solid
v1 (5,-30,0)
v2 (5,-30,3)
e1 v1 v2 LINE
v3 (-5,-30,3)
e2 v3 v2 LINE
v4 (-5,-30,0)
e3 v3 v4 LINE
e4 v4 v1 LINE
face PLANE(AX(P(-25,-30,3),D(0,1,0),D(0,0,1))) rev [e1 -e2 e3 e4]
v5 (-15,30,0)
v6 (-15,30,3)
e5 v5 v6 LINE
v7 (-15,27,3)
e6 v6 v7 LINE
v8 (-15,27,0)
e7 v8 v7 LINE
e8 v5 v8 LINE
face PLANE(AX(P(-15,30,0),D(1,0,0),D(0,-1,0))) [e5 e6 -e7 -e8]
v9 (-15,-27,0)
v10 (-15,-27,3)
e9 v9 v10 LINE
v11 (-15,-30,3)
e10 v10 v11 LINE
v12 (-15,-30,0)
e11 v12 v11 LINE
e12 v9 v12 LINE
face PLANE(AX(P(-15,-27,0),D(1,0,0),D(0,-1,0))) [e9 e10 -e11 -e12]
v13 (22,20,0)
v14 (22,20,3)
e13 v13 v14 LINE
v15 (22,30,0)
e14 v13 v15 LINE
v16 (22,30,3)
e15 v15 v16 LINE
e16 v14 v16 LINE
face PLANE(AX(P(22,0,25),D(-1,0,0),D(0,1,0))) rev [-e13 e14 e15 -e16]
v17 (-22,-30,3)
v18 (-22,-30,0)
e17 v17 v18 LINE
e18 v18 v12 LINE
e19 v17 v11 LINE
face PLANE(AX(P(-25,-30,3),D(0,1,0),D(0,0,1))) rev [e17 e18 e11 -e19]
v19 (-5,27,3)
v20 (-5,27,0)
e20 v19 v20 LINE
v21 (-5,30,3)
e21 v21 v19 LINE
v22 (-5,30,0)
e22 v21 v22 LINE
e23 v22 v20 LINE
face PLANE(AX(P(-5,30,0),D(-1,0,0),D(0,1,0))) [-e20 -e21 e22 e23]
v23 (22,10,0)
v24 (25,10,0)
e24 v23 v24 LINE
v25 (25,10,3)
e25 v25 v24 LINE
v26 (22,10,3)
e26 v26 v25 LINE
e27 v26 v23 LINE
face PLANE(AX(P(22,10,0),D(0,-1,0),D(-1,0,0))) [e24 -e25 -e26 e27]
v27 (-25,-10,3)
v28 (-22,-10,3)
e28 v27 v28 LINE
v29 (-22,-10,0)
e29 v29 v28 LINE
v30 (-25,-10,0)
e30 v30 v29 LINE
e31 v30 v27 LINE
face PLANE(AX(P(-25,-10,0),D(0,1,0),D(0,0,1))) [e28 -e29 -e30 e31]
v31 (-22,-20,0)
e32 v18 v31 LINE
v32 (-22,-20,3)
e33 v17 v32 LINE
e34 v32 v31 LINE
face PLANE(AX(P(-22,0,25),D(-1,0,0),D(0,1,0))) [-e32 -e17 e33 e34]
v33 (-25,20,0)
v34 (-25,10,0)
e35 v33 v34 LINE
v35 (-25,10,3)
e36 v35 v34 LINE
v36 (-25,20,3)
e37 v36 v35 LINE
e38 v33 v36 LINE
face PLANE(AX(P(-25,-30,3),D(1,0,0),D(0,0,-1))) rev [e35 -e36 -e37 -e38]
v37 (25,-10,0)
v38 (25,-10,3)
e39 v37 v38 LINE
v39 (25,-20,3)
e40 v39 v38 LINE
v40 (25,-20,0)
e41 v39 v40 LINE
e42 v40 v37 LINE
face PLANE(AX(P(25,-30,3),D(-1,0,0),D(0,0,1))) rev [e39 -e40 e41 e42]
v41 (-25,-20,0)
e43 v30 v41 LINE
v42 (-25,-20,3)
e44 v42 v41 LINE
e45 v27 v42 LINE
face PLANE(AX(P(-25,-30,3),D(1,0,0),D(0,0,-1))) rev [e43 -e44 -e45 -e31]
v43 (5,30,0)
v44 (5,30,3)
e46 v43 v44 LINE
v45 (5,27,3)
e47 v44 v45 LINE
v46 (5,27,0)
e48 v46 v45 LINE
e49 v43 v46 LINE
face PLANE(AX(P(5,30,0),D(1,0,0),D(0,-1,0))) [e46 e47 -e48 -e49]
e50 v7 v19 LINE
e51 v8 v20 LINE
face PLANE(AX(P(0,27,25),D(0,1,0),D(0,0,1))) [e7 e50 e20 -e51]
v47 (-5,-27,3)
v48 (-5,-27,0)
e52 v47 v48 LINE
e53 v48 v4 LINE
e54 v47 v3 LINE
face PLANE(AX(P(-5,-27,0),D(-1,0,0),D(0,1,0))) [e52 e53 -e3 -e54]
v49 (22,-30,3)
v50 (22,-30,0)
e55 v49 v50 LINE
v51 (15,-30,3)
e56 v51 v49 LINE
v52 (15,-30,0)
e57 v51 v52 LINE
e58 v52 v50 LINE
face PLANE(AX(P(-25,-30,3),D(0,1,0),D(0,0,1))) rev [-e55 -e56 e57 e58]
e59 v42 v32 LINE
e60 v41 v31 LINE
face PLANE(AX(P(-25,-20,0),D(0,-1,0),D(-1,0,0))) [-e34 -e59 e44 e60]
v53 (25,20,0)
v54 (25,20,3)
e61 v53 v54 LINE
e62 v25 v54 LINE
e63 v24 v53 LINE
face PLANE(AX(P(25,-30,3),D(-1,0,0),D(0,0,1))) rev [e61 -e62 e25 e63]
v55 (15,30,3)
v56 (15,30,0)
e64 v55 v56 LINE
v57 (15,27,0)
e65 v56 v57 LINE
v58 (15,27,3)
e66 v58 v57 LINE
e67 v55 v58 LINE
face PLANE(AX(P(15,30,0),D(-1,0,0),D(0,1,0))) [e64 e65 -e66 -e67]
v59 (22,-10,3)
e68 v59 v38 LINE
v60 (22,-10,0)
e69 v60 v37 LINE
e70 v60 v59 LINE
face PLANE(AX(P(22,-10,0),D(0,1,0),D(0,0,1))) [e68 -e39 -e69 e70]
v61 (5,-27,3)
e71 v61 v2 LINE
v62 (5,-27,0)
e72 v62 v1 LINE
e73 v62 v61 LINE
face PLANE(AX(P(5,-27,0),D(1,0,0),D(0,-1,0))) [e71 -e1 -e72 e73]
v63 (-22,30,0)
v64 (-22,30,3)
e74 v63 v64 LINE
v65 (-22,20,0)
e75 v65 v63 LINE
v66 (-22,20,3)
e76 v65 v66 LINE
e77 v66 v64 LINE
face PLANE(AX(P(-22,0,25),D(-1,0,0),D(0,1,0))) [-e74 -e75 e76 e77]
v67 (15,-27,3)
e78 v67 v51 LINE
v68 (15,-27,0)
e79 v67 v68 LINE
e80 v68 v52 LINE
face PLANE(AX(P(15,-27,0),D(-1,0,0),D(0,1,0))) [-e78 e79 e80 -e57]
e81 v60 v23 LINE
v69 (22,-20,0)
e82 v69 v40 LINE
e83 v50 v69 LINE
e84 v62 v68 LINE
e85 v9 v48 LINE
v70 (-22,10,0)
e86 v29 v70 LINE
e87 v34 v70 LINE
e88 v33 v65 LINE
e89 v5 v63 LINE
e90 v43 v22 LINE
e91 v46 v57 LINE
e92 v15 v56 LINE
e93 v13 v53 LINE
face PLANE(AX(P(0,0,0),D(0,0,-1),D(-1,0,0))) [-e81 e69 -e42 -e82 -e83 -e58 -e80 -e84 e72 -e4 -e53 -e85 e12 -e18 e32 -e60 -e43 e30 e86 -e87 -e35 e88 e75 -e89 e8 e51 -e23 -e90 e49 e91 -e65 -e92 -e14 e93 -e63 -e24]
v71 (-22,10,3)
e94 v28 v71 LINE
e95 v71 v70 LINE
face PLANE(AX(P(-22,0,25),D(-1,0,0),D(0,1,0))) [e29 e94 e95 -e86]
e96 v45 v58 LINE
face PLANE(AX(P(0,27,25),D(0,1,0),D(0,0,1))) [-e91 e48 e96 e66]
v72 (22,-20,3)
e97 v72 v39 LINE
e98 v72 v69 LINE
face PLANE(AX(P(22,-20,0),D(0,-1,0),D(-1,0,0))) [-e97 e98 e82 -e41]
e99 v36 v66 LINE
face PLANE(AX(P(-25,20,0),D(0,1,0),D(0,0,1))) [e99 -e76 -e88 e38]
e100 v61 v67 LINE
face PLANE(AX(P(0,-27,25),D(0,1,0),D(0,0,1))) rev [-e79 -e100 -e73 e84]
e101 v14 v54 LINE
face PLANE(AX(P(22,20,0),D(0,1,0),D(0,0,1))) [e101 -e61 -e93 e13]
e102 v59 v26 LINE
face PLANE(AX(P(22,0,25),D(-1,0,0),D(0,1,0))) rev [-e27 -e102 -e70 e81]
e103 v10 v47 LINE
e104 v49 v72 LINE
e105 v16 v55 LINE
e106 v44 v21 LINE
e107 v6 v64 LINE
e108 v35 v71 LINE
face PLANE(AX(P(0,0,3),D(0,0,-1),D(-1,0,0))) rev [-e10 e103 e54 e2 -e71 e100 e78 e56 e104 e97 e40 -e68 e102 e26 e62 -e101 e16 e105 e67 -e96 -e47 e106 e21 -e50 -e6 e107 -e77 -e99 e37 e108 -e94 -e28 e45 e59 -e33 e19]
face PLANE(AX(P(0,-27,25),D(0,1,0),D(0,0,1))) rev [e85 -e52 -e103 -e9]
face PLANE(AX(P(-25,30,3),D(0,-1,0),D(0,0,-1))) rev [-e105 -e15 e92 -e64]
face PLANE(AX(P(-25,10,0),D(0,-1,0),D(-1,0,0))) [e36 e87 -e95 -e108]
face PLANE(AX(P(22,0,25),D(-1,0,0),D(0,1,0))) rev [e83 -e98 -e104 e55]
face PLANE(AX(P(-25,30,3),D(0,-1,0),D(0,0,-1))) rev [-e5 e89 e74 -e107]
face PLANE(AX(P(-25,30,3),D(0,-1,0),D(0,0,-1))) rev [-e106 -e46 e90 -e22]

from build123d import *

# Parameters (mm, degrees)
SKETCH1_W             = 50
SKETCH1_H             = 60
BOSS_EXTRUDE1_DEPTH   = 3
CAVITY8_START         = -10
CAVITY8_OUTLINE_W     = 3
CAVITY8_OUTLINE_H     = 3
CAVITY8_DEPTH         = 20
CAVITY8_START_2       = -30
CAVITY8_2_OUTLINE_W   = 10
CAVITY8_2_OUTLINE_H   = 3
CAVITY8_2_OUTLINE_W_2 = 3
CAVITY8_2_DEPTH       = 3
CAVITY8_START_3       = 27
CAVITY8_3_OUTLINE_W   = 10
CAVITY8_3_OUTLINE_H   = 3
CAVITY8_3_OUTLINE_W_2 = 3
CAVITY8_3_DEPTH       = 3
CAVITY8_START_4       = -27
CAVITY8_4_OUTLINE_W   = 3
CAVITY8_4_OUTLINE_H   = 3
CAVITY8_4_DEPTH       = 7
CAVITY8_START_5       = 20
CAVITY8_5_OUTLINE_W   = 3
CAVITY8_5_OUTLINE_H   = 3
CAVITY8_5_DEPTH       = 7


# Read off the part's stored shape, not the designer's step: Cavity8
with BuildPart() as part:
    # Sketch1 → Boss-Extrude1 (new body)
    with BuildSketch(Plane.XY):
        Rectangle(SKETCH1_W, SKETCH1_H)
    extrude(amount=BOSS_EXTRUDE1_DEPTH)

    # Cavity8 outline → Cavity8 (cut)
    with BuildSketch(Plane(origin=(0, 0, 0), x_dir=(1, 0, 0), z_dir=(0, 1, 0)).offset(CAVITY8_START)):
        with Locations((23.5, -1.5)):
            Rectangle(CAVITY8_OUTLINE_W, CAVITY8_OUTLINE_H)
        with Locations((-23.5, -1.5)):
            Rectangle(CAVITY8_OUTLINE_W, CAVITY8_OUTLINE_H)
    extrude(amount=CAVITY8_DEPTH, mode=Mode.SUBTRACT)

    # Cavity8 2 outline → Cavity8 2 (cut)
    with BuildSketch(Plane(origin=(0, 0, 0), x_dir=(1, 0, 0), z_dir=(0, 1, 0)).offset(CAVITY8_START_2)):
        with Locations((10, -1.5)):
            Rectangle(CAVITY8_2_OUTLINE_W, CAVITY8_2_OUTLINE_H)
        with Locations((-10, -1.5)):
            Rectangle(CAVITY8_2_OUTLINE_W, CAVITY8_2_OUTLINE_H)
        with Locations((23.5, -1.5)):
            Rectangle(CAVITY8_2_OUTLINE_W_2, CAVITY8_2_OUTLINE_H)
        with Locations((-23.5, -1.5)):
            Rectangle(CAVITY8_2_OUTLINE_W_2, CAVITY8_2_OUTLINE_H)
    extrude(amount=CAVITY8_2_DEPTH, mode=Mode.SUBTRACT)

    # Cavity8 3 outline → Cavity8 3 (cut)
    with BuildSketch(Plane(origin=(0, 0, 0), x_dir=(1, 0, 0), z_dir=(0, 1, 0)).offset(CAVITY8_START_3)):
        with Locations((10, -1.5)):
            Rectangle(CAVITY8_3_OUTLINE_W, CAVITY8_3_OUTLINE_H)
        with Locations((-10, -1.5)):
            Rectangle(CAVITY8_3_OUTLINE_W, CAVITY8_3_OUTLINE_H)
        with Locations((23.5, -1.5)):
            Rectangle(CAVITY8_3_OUTLINE_W_2, CAVITY8_3_OUTLINE_H)
        with Locations((-23.5, -1.5)):
            Rectangle(CAVITY8_3_OUTLINE_W_2, CAVITY8_3_OUTLINE_H)
    extrude(amount=CAVITY8_3_DEPTH, mode=Mode.SUBTRACT)

    # Cavity8 4 outline → Cavity8 4 (cut)
    with BuildSketch(Plane(origin=(0, 0, 0), x_dir=(1, 0, 0), z_dir=(0, 1, 0)).offset(CAVITY8_START_4)):
        with Locations((23.5, -1.5)):
            Rectangle(CAVITY8_4_OUTLINE_W, CAVITY8_4_OUTLINE_H)
        with Locations((-23.5, -1.5)):
            Rectangle(CAVITY8_4_OUTLINE_W, CAVITY8_4_OUTLINE_H)
    extrude(amount=CAVITY8_4_DEPTH, mode=Mode.SUBTRACT)

    # Cavity8 5 outline → Cavity8 5 (cut)
    with BuildSketch(Plane(origin=(0, 0, 0), x_dir=(1, 0, 0), z_dir=(0, 1, 0)).offset(CAVITY8_START_5)):
        with Locations((23.5, -1.5)):
            Rectangle(CAVITY8_5_OUTLINE_W, CAVITY8_5_OUTLINE_H)
        with Locations((-23.5, -1.5)):
            Rectangle(CAVITY8_5_OUTLINE_W, CAVITY8_5_OUTLINE_H)
    extrude(amount=CAVITY8_5_DEPTH, mode=Mode.SUBTRACT)


solid = part.part
